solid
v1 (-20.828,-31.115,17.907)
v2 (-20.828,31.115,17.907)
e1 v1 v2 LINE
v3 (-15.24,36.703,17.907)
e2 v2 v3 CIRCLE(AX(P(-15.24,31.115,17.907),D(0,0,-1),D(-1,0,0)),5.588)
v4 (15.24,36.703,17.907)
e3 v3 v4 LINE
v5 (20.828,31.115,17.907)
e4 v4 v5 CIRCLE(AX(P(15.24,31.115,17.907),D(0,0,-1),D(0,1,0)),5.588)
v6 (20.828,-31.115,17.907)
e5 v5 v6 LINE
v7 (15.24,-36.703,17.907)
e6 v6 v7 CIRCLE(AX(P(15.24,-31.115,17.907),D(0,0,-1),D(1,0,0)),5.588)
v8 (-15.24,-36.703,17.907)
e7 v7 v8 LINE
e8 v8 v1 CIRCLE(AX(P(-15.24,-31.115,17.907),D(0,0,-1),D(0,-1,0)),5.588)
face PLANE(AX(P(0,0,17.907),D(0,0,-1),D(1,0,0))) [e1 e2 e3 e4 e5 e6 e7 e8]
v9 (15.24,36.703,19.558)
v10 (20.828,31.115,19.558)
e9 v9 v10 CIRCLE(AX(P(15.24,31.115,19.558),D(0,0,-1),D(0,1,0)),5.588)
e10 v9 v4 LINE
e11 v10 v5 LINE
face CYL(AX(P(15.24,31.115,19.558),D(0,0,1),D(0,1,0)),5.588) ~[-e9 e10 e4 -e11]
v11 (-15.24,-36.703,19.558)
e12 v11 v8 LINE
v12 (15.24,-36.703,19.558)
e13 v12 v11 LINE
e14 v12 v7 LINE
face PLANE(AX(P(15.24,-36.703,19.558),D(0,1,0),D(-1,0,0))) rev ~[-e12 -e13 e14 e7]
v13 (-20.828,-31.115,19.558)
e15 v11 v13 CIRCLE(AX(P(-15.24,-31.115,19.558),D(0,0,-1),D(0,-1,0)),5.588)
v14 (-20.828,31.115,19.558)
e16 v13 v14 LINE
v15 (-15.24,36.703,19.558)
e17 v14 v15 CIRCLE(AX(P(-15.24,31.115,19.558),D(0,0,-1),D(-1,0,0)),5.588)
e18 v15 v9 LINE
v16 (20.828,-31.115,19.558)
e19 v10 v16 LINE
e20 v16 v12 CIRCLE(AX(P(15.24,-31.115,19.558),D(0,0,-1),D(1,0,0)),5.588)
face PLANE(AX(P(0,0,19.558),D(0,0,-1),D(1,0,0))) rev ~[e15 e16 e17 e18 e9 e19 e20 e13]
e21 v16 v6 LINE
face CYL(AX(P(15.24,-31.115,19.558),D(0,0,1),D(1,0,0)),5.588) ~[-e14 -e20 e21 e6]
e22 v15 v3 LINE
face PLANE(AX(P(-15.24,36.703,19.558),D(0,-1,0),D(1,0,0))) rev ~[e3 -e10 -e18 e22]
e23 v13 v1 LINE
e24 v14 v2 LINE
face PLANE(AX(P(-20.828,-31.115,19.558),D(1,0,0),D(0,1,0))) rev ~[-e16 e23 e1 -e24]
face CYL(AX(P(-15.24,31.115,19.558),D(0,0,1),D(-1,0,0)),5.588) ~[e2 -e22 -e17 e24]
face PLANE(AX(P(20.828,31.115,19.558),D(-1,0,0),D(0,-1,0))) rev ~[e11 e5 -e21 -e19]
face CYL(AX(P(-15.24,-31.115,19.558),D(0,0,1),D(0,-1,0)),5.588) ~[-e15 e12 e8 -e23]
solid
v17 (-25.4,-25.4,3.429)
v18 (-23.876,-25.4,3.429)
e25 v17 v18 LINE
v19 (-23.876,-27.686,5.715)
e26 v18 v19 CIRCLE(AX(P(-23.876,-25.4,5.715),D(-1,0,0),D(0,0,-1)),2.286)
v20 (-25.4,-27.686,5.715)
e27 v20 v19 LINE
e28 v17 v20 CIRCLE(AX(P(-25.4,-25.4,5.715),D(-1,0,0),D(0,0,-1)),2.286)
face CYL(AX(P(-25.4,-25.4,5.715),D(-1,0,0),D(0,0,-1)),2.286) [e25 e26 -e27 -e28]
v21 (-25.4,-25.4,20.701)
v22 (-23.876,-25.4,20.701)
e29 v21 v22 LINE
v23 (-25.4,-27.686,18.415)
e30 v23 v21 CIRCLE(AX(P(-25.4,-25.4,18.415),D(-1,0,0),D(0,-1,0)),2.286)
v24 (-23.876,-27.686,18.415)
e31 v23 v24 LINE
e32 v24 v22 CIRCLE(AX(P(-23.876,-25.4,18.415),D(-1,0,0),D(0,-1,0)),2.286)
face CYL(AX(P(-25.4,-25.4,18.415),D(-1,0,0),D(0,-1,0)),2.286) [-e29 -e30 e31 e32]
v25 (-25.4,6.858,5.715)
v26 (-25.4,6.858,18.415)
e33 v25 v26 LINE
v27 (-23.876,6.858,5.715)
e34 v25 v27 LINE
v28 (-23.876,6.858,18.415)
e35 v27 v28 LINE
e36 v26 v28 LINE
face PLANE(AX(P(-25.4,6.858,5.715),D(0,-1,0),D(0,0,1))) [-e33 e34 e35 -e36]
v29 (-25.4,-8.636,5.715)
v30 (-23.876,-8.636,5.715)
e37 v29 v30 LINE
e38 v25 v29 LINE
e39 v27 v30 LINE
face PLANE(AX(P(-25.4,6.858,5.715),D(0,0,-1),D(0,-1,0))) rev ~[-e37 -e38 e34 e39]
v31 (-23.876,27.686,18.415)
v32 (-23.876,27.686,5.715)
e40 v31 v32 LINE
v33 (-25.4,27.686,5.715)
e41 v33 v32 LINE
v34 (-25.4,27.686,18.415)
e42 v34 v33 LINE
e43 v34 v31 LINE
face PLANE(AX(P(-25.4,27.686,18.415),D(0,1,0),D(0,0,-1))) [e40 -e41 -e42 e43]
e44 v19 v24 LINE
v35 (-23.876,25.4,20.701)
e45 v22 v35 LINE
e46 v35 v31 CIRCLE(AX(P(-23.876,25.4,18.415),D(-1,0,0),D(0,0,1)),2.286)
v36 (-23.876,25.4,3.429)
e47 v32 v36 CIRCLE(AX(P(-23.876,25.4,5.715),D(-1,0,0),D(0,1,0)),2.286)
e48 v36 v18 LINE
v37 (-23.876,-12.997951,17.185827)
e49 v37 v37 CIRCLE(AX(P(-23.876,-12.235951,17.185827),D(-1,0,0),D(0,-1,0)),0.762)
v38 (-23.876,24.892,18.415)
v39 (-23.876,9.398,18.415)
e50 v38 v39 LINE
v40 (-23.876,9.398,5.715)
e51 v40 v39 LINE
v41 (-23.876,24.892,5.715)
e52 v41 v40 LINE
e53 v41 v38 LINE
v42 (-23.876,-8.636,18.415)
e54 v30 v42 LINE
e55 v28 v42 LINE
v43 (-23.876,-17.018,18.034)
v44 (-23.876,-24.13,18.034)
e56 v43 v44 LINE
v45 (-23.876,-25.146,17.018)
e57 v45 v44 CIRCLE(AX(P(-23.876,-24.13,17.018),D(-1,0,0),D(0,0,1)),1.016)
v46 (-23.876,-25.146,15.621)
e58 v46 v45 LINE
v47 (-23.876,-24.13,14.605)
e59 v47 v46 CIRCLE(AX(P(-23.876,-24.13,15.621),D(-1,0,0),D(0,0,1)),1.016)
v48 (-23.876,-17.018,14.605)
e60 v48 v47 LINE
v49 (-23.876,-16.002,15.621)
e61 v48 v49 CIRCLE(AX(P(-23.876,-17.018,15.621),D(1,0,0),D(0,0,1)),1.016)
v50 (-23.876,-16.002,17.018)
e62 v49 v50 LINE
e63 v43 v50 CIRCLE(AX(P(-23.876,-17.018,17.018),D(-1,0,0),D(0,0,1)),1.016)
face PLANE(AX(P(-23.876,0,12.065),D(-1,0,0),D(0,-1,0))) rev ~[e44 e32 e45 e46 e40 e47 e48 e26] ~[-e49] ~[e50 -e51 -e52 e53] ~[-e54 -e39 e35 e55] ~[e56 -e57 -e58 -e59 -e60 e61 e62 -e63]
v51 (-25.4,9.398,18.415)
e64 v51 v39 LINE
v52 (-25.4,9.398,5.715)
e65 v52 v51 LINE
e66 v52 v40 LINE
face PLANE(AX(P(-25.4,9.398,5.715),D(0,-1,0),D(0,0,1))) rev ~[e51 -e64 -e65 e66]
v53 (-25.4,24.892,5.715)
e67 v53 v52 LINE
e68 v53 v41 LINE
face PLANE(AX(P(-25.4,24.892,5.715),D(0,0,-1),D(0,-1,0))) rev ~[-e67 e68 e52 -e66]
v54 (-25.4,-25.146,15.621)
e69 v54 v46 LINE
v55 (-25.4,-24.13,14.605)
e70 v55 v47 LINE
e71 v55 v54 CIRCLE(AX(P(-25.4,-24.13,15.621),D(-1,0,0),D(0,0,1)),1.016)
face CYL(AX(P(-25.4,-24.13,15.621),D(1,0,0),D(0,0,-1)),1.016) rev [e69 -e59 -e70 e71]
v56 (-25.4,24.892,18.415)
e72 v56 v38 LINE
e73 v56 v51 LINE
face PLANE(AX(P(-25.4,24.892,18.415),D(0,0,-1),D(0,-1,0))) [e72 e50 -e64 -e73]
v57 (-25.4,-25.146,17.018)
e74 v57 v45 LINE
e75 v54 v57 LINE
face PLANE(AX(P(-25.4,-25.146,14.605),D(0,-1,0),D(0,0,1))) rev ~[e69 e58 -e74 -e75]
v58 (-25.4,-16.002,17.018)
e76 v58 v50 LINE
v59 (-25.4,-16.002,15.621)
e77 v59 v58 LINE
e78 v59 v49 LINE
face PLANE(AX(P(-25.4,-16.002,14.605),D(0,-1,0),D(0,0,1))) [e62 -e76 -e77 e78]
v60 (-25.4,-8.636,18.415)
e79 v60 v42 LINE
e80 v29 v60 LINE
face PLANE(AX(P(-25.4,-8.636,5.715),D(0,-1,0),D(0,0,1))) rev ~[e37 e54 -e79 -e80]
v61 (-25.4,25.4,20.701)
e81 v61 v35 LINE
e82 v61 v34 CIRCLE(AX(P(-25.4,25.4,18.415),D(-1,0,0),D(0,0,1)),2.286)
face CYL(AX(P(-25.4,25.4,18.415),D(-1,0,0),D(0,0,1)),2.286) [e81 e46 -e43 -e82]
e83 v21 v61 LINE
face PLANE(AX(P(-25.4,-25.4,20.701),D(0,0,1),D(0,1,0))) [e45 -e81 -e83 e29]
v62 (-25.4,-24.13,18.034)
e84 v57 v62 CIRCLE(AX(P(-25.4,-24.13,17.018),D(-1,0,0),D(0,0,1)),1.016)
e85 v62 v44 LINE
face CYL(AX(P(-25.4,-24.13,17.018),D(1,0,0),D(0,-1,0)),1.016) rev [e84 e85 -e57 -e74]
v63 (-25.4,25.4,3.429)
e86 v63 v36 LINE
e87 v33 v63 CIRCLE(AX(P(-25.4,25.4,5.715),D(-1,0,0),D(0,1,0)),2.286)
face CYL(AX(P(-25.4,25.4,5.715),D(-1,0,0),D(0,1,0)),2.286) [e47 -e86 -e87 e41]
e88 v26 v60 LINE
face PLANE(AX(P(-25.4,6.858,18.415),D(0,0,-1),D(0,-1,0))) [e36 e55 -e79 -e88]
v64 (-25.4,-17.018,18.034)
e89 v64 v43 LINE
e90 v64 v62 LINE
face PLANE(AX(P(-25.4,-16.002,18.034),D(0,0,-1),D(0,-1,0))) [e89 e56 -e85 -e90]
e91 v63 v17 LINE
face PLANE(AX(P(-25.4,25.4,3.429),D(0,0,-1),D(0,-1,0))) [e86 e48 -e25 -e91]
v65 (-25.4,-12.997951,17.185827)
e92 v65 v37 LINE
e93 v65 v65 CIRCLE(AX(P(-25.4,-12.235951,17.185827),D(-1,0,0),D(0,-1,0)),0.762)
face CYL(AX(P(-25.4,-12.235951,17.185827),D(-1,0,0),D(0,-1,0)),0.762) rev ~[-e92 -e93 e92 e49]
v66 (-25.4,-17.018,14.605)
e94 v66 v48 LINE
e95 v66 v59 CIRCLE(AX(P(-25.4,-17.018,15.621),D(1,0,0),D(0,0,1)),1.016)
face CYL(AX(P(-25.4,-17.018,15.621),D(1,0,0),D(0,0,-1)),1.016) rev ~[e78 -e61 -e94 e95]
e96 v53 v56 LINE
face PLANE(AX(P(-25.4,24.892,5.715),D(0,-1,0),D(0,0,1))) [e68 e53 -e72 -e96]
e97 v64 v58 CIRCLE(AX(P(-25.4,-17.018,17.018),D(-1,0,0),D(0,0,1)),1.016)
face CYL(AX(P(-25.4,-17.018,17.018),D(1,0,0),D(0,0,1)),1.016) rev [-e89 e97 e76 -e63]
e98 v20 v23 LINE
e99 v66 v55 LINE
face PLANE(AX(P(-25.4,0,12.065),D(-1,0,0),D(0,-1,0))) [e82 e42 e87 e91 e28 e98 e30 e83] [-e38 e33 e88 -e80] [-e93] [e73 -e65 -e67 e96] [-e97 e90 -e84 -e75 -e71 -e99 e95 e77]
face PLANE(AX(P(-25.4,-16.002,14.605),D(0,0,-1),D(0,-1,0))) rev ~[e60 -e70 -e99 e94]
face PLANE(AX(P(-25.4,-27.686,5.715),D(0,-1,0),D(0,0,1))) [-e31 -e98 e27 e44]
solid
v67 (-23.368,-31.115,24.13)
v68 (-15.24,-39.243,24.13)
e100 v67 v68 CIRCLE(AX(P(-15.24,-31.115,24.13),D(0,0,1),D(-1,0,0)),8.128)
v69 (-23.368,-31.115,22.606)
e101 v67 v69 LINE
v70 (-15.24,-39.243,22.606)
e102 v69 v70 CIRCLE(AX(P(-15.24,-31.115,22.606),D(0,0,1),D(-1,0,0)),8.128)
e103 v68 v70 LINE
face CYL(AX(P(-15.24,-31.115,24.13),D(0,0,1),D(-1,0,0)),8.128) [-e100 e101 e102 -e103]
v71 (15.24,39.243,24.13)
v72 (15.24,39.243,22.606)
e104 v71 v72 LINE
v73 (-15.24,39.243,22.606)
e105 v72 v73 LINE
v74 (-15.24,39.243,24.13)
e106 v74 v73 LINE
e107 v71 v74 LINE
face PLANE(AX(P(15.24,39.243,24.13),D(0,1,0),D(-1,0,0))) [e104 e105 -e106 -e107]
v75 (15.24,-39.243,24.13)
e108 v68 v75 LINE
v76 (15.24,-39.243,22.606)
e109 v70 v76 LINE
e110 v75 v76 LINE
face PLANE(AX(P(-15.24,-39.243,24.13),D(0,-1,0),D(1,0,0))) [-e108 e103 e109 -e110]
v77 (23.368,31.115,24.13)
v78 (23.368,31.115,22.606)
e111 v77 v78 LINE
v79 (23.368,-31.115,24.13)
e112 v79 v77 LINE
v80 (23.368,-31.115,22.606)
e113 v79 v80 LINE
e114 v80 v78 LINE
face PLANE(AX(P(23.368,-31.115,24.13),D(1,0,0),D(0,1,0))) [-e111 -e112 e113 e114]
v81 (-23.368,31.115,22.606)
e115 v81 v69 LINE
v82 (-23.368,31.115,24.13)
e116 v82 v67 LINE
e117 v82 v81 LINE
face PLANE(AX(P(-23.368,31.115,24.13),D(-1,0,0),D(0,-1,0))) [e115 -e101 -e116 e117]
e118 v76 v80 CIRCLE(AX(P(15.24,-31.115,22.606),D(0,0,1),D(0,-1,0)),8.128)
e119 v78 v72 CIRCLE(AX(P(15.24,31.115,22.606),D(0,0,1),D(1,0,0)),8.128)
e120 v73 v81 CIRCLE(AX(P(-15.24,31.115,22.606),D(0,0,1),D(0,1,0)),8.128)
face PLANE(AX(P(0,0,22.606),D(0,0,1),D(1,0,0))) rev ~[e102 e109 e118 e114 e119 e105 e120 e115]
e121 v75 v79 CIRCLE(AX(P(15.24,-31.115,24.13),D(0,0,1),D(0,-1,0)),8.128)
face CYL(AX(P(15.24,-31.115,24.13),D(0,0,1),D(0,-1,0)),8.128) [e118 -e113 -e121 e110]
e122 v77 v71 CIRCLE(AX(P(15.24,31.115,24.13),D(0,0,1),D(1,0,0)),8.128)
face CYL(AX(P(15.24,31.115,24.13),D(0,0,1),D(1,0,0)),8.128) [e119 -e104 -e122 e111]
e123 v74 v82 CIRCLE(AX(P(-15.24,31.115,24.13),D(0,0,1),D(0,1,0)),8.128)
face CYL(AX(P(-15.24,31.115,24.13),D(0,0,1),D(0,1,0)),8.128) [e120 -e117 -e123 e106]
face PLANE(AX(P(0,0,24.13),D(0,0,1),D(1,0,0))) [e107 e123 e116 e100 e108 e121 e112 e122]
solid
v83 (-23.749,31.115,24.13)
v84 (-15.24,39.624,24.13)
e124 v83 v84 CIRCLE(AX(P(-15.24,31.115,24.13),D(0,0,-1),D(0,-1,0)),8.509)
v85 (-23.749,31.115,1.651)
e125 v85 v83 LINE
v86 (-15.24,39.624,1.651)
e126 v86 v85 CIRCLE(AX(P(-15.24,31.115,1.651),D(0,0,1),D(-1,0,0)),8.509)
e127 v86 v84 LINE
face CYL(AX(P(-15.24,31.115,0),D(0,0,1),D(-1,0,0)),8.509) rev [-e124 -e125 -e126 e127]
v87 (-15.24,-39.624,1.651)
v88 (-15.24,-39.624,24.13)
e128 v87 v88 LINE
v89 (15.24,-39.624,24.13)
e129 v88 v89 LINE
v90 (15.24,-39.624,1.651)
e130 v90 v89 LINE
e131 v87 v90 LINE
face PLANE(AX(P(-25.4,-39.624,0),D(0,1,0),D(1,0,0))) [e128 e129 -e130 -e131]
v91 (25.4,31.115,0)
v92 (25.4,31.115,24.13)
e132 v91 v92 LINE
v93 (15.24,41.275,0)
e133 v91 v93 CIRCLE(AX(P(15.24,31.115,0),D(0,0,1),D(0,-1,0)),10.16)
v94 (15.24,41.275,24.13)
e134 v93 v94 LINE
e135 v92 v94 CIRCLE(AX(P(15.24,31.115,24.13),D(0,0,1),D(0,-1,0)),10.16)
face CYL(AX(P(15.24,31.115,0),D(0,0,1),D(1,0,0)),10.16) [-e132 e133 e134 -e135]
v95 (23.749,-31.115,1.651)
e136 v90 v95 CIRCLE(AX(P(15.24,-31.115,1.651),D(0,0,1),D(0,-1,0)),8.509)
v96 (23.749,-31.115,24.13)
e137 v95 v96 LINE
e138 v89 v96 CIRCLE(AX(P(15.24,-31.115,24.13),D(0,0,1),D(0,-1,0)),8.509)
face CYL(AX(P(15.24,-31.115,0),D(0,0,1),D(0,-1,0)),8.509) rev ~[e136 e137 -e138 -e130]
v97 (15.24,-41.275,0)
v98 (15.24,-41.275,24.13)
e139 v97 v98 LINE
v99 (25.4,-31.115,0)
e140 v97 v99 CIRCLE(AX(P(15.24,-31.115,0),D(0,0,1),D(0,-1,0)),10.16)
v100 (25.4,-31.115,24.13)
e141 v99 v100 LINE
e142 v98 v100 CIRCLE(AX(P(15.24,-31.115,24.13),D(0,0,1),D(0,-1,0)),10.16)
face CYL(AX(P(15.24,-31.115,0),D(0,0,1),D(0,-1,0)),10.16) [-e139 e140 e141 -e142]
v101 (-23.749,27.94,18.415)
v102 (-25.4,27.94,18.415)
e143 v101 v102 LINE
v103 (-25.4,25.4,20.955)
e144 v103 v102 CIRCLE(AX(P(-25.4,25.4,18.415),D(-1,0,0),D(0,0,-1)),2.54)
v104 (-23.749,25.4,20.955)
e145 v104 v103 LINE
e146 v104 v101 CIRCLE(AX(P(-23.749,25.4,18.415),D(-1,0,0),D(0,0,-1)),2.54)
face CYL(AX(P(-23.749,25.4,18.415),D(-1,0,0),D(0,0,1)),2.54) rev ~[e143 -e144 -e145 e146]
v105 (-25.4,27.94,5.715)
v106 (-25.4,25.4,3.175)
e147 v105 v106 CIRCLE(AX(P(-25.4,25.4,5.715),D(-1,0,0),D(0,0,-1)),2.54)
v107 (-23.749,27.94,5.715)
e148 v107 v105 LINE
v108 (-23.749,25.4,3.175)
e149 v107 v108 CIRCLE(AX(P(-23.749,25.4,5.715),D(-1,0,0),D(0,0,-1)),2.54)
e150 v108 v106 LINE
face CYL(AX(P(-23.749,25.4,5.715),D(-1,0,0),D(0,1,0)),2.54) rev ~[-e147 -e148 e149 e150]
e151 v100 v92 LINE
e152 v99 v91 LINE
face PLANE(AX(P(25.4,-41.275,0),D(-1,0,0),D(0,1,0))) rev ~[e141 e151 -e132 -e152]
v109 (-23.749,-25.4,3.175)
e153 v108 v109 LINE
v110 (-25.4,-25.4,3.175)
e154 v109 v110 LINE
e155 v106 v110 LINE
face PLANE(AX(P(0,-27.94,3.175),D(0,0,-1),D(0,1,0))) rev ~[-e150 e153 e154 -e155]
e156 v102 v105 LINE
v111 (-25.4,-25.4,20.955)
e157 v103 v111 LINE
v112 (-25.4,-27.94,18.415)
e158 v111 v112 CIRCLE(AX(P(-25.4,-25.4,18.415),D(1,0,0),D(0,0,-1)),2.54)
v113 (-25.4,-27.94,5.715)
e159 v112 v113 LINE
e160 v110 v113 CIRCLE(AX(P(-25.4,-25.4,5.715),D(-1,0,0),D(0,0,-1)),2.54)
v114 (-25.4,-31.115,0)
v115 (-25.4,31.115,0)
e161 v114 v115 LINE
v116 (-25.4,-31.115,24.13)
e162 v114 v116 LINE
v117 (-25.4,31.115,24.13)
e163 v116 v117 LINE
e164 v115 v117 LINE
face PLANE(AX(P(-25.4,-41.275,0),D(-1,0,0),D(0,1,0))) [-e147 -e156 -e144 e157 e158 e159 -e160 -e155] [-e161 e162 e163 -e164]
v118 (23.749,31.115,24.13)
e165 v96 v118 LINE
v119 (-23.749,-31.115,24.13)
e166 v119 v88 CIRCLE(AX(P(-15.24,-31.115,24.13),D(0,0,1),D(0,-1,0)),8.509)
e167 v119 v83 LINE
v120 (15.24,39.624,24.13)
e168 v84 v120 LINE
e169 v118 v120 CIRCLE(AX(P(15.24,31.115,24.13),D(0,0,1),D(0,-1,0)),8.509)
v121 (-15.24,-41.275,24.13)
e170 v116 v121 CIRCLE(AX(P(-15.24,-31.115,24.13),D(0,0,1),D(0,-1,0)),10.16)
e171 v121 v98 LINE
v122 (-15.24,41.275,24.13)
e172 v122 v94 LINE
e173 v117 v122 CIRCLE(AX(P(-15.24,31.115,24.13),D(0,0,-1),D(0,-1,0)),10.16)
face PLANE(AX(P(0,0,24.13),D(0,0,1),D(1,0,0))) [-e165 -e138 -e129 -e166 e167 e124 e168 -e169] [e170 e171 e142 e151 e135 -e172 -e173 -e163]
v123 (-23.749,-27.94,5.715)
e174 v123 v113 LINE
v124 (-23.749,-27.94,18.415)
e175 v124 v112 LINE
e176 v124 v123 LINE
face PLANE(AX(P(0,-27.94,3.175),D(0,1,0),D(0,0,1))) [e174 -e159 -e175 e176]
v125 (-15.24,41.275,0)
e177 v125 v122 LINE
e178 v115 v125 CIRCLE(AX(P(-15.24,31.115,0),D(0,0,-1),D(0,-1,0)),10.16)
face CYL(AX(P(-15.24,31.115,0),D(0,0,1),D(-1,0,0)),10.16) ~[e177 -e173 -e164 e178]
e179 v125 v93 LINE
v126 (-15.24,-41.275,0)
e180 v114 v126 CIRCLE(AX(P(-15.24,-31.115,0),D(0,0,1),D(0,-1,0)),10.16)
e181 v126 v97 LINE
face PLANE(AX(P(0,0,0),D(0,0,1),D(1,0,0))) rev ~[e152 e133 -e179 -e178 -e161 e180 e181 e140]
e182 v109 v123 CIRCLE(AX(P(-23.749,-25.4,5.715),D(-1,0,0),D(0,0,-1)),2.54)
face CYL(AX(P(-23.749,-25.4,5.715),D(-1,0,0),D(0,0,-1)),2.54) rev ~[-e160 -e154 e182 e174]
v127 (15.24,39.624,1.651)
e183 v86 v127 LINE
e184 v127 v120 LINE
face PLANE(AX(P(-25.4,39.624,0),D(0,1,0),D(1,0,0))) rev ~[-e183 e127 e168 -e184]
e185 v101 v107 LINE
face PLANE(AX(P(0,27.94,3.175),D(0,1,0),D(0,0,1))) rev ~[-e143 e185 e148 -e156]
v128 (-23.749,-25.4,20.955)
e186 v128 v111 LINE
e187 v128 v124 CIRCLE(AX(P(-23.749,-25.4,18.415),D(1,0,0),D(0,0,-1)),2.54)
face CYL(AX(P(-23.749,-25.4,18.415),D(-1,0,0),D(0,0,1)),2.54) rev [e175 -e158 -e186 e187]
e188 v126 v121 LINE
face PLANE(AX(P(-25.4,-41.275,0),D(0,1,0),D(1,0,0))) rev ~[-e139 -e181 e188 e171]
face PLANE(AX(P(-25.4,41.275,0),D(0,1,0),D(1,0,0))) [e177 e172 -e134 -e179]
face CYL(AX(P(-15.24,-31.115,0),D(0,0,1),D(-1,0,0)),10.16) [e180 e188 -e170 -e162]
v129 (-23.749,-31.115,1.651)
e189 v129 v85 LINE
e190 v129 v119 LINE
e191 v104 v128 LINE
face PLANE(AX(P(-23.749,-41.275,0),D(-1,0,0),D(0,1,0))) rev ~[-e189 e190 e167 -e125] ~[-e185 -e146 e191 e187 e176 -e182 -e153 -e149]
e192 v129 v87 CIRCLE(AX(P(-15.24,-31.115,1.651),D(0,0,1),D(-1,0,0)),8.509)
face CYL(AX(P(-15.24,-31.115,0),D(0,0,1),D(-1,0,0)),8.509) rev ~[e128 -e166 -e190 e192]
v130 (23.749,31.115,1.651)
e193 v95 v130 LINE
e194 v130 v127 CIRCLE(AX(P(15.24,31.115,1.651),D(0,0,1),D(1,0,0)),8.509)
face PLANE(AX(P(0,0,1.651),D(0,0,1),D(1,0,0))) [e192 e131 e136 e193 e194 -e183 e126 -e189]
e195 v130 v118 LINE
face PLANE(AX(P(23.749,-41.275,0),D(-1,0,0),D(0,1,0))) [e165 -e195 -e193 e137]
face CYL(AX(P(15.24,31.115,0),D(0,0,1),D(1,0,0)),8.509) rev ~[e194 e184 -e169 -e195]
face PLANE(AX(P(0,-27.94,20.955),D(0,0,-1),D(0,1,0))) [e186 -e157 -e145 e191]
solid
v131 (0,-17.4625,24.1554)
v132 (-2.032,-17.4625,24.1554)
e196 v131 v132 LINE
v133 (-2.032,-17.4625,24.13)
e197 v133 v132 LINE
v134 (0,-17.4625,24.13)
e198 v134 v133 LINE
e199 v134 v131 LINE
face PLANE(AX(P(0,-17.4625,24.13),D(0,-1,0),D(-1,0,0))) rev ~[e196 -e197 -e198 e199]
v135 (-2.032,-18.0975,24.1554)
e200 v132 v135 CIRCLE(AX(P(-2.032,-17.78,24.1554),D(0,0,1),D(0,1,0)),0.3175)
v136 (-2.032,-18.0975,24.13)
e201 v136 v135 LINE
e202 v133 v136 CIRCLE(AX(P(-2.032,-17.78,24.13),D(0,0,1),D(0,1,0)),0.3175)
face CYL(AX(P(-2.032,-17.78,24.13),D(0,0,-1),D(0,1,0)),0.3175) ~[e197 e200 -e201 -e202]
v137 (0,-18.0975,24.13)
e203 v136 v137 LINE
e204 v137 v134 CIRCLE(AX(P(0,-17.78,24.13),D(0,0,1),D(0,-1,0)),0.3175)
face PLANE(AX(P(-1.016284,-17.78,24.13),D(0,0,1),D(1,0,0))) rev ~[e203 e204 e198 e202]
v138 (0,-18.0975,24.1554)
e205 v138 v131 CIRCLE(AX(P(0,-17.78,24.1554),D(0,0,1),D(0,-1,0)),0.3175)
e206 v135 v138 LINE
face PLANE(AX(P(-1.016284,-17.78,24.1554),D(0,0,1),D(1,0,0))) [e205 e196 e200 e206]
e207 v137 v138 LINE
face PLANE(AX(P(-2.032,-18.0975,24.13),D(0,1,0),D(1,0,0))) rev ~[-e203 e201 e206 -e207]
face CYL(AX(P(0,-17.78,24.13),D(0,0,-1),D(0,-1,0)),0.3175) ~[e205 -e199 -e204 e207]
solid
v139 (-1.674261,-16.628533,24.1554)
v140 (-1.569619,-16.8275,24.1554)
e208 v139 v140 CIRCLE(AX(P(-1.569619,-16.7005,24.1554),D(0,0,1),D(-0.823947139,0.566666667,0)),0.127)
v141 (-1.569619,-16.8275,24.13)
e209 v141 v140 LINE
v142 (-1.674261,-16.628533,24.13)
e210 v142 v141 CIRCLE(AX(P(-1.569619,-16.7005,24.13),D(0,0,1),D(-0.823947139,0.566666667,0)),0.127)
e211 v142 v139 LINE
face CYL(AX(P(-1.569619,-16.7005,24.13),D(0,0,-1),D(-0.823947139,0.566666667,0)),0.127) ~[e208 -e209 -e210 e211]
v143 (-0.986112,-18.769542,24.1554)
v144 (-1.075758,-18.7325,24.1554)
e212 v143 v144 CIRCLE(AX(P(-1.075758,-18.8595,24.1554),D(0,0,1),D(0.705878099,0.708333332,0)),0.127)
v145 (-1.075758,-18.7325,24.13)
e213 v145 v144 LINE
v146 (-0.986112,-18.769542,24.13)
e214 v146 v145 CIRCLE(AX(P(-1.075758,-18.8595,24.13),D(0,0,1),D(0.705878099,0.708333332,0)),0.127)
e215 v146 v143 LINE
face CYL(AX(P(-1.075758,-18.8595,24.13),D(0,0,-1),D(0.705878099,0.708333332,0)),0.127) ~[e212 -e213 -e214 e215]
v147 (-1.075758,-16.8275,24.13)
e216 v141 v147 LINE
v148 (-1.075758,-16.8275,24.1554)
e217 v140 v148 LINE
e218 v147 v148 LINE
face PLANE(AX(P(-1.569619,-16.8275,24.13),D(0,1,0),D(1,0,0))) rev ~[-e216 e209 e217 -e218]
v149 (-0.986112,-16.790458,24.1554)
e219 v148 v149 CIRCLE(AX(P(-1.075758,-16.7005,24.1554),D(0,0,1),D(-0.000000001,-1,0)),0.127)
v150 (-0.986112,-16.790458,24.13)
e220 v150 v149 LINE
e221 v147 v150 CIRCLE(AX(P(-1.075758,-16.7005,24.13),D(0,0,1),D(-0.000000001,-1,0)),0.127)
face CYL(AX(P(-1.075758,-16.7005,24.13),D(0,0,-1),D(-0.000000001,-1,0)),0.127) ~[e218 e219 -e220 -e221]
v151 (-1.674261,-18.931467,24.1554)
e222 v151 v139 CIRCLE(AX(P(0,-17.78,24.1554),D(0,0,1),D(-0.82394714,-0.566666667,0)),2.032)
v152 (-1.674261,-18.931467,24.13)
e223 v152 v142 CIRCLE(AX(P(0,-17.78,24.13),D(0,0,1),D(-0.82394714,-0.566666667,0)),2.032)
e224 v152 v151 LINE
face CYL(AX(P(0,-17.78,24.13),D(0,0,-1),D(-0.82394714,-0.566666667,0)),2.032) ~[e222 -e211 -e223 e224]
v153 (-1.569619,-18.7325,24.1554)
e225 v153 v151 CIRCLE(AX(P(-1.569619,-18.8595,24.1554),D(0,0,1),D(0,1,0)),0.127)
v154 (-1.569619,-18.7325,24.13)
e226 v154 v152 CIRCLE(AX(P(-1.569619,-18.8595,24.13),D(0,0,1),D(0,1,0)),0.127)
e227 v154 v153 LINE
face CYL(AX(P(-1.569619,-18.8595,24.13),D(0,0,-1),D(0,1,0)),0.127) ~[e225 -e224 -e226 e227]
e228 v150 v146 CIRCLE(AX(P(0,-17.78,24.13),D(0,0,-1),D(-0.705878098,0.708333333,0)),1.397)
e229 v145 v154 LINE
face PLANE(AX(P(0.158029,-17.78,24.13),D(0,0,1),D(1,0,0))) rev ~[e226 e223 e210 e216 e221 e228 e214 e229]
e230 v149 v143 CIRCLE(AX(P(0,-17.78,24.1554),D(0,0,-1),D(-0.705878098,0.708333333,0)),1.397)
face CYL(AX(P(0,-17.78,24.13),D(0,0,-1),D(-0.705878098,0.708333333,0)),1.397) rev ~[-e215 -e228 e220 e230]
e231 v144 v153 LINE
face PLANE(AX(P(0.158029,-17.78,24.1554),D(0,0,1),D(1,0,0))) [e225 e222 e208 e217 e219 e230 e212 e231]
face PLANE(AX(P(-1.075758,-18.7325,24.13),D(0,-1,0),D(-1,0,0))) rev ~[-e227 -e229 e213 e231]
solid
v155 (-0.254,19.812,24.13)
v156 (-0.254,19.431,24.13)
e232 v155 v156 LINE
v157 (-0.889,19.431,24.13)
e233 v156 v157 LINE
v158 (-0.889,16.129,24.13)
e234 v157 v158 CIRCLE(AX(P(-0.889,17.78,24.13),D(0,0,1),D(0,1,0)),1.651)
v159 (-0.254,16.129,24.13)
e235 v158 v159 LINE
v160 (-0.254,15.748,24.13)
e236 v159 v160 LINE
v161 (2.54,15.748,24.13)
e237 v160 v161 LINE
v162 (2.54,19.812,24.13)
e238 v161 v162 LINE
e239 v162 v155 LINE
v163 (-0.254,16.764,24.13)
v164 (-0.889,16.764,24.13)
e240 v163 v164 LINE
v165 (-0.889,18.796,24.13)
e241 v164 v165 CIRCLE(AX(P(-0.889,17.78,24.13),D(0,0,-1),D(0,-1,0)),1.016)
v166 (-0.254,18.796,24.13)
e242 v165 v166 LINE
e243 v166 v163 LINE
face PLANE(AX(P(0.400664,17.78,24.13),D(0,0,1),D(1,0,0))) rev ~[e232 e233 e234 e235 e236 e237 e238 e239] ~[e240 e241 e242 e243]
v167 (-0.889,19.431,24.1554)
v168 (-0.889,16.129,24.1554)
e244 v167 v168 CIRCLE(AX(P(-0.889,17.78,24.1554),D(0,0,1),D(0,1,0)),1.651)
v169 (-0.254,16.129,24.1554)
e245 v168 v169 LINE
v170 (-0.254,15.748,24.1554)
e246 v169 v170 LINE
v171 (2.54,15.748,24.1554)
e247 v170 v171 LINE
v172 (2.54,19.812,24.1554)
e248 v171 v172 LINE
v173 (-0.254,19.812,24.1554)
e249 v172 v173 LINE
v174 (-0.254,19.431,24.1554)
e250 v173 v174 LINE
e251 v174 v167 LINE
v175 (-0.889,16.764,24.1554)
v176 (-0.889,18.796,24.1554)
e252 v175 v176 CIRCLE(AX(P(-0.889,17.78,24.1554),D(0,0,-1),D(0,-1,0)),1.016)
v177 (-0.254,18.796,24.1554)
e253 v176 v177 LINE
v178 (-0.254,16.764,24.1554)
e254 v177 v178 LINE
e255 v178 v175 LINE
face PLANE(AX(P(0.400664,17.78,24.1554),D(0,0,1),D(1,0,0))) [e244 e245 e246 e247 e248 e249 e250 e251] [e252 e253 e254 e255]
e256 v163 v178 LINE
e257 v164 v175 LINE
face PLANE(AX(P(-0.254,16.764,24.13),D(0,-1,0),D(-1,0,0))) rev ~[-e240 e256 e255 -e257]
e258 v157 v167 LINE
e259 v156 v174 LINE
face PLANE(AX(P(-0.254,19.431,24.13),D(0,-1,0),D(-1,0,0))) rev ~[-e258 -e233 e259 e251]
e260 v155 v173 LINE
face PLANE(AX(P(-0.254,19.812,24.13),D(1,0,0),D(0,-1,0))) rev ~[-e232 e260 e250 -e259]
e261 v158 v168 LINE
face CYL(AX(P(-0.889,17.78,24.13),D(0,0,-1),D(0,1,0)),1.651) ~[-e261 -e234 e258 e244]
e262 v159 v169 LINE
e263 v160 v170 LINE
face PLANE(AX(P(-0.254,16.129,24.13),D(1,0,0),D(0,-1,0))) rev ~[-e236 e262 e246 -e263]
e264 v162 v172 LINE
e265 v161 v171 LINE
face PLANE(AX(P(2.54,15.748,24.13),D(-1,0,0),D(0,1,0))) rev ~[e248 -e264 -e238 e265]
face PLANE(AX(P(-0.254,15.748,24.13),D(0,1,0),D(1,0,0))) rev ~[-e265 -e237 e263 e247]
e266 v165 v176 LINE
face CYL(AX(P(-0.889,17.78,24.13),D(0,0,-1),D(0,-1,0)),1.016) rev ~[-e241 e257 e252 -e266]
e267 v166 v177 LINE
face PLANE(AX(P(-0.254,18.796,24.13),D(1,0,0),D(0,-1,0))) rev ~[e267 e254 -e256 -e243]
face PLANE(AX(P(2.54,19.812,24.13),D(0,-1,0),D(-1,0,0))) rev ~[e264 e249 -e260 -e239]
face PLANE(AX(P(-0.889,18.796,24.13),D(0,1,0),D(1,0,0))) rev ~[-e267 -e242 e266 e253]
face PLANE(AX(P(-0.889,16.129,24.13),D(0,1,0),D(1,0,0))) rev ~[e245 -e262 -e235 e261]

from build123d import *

# Parameters (mm, degrees)
F0_W      = 50.8
F0_H      = 82.55
F1_DEPTH  = 24.13
F2_R      = 10.16
F3_T      = -1.651
F5_DEPTH  = 6.35
F8_T      = -1.524
F14_DEPTH = 1.651
F16_DEPTH = 0.0254
F18_DEPTH = 0.0254
F19_W     = 55.88
F19_H     = 17.78
F20_DEPTH = 25.401
F21_R     = 2.54
F23_DEPTH = 1.524
F24_W     = 15.494
F24_H     = 12.7
F24_W_2   = 9.144
F24_H_2   = 3.429
F24_R     = 0.762
F25_DEPTH = 50.801
F26_R     = 1.016


with BuildPart() as f1:
    # F0 (on Top) → F1 (new body)
    with BuildSketch(Plane.XY):
        Rectangle(F0_W, F0_H)
    extrude(amount=F1_DEPTH)

    # F2
    f2_edges = [f1.edges().sort_by_distance(p)[0] for p in [
        (25.4, -41.275, 12.065),
        (-25.4, -41.275, 12.065),
        (25.4, 41.275, 12.065),
        (-25.4, 41.275, 12.065),
    ]]
    fillet(f2_edges, radius=F2_R)

    # F3
    f3_openings = [f1.faces().sort_by_distance(p)[0] for p in [
        (0, 0, 24.13),
    ]]
    offset(amount=F3_T, openings=f3_openings)

    # F19 (on Right) → F20 (cut, through all)
    with BuildSketch(Plane.YZ):
        with Locations((0, 12.065)):
            Rectangle(F19_W, F19_H)
    extrude(amount=-F20_DEPTH, mode=Mode.SUBTRACT)

    # F21
    f21_edges = [f1.edges().sort_by_distance(p)[0] for p in [
        (-24.5745, 27.94, 20.955),
        (-24.5745, -27.94, 20.955),
        (-24.5745, -27.94, 3.175),
        (-24.5745, 27.94, 3.175),
    ]]
    fillet(f21_edges, radius=F21_R)


with BuildPart() as f5:
    # F4 (on face) → F5 (new body)
    with BuildSketch(Plane.XY.offset(24.13)):
        with BuildLine():
            Line((15.24, 39.243), (-15.24, 39.243))
            ThreePointArc((-15.24, 39.243), (-20.9873639175, 36.8623639175), (-23.368, 31.115))
            Line((-23.368, 31.115), (-23.368, -31.115))
            ThreePointArc((-23.368, -31.115), (-20.9873639175, -36.8623639175), (-15.24, -39.243))
            Line((-15.24, -39.243), (15.24, -39.243))
            ThreePointArc((15.24, -39.243), (20.9873639175, -36.8623639175), (23.368, -31.115))
            Line((23.368, -31.115), (23.368, 31.115))
            ThreePointArc((23.368, 31.115), (20.9873639175, 36.8623639175), (15.24, 39.243))
        make_face()
    extrude(amount=-F5_DEPTH)

    # F8
    f8_openings = [f5.faces().sort_by_distance(p)[0] for p in [
        (0, 0, 17.78),
        (0, -39.243, 20.955),
        (20.987364, -36.862364, 20.955),
        (-20.987364, -36.862364, 20.955),
        (23.368, 0, 20.955),
        (20.987364, 36.862364, 20.955),
        (0, 39.243, 20.955),
        (-20.987364, 36.862364, 20.955),
        (-23.368, 0, 20.955),
    ]]
    offset(amount=F8_T, openings=f8_openings)


with BuildPart() as f14:
    # F13 (on offset) → F14 (new body)
    with BuildSketch(Plane(origin=(0, 0, 19.558), x_dir=(1, 0, 0), z_dir=(0, 0, -1))):
        with BuildLine():
            Line((-20.828, 31.115), (-20.828, -31.115))
            ThreePointArc((-20.828, -31.115), (-19.1913126933, -35.0663126933), (-15.24, -36.703))
            Line((-15.24, -36.703), (15.24, -36.703))
            ThreePointArc((15.24, -36.703), (19.1913126933, -35.0663126933), (20.828, -31.115))
            Line((20.828, -31.115), (20.828, 31.115))
            ThreePointArc((20.828, 31.115), (19.1913126933, 35.0663126933), (15.24, 36.703))
            Line((15.24, 36.703), (-15.24, 36.703))
            ThreePointArc((-15.24, 36.703), (-19.1913126933, 35.0663126933), (-20.828, 31.115))
        make_face()
    extrude(amount=F14_DEPTH)


with BuildPart() as f16:
    # F15 (on face) → F16 (new body)
    with BuildSketch(Plane.XY.offset(24.13)):
        with BuildLine():
            ThreePointArc((-2.032, -18.0975), (-2.0195881687, -18.0972573032), (-2.0071953125, -18.0965295839))
            ThreePointArc((-2.0071953125, -18.0965295839), (-2.0071187349, -18.0970148012), (-2.0070420399, -18.0975))
            Line((-2.0070420399, -18.0975), (0, -18.0975))
            ThreePointArc((0, -18.0975), (0.3175, -17.78), (0, -17.4625))
            Line((0, -17.4625), (-2.0070420399, -17.4625))
            ThreePointArc((-2.0070420399, -17.4625), (-2.0071187349, -17.4629851988), (-2.0071953125, -17.4634704161))
            ThreePointArc((-2.0071953125, -17.4634704161), (-2.0195881687, -17.4627426968), (-2.032, -17.4625))
            ThreePointArc((-2.032, -17.4625), (-2.3495, -17.78), (-2.032, -18.0975))
        make_face()
        with BuildLine():
            ThreePointArc((-2.0070420399, -18.0975), (-2.0071187349, -18.0970148012), (-2.0071953125, -18.0965295839))
            ThreePointArc((-2.0071953125, -18.0965295839), (-2.0195881687, -18.0972573032), (-2.032, -18.0975))
            Line((-2.032, -18.0975), (-2.0070420399, -18.0975))
        make_face()
        with BuildLine():
            Line((-2.0070420399, -17.4625), (-2.032, -17.4625))
            ThreePointArc((-2.032, -17.4625), (-2.0195881687, -17.4627426968), (-2.0071953125, -17.4634704161))
            ThreePointArc((-2.0071953125, -17.4634704161), (-2.0071187349, -17.4629851988), (-2.0070420399, -17.4625))
        make_face()
    extrude(amount=F16_DEPTH)


with BuildPart() as f16b:
    # F15 (on face) → F16, piece 2 (new body)
    with BuildSketch(Plane.XY.offset(24.13)):
        with BuildLine():
            ThreePointArc((-0.9861117026, -16.7904583333), (1.397, -17.78), (-0.9861117026, -18.7695416667))
            ThreePointArc((-0.9861117026, -18.7695416667), (-1.0272592949, -18.7421251553), (-1.075758221, -18.7325))
            Line((-1.075758221, -18.7325), (-1.569619301, -18.7325))
            ThreePointArc((-1.569619301, -18.7325), (-1.6820220738, -18.8003847171), (-1.6742605877, -18.9314666667))
            ThreePointArc((-1.6742605877, -18.9314666667), (2.032, -17.78), (-1.6742605877, -16.6285333333))
            ThreePointArc((-1.6742605877, -16.6285333333), (-1.6820220738, -16.7596152829), (-1.569619301, -16.8275))
            Line((-1.569619301, -16.8275), (-1.075758221, -16.8275))
            ThreePointArc((-1.075758221, -16.8275), (-1.0272592949, -16.8178748447), (-0.9861117026, -16.7904583333))
        make_face()
    extrude(amount=F16_DEPTH)


with BuildPart() as f18:
    # F17 (on face) → F18 (new body)
    with BuildSketch(Plane.XY.offset(24.13)):
        with BuildLine():
            Line((2.54, 15.748), (2.54, 19.812))
            Line((2.54, 19.812), (-0.254, 19.812))
            Line((-0.254, 19.812), (-0.254, 19.431))
            Line((-0.254, 19.431), (-0.889, 19.431))
            ThreePointArc((-0.889, 19.431), (-2.54, 17.78), (-0.889, 16.129))
            Line((-0.889, 16.129), (-0.254, 16.129))
            Line((-0.254, 16.129), (-0.254, 15.748))
            Line((-0.254, 15.748), (2.54, 15.748))
        make_face()
        with BuildLine():
            ThreePointArc((-0.889, 16.764), (-1.905, 17.78), (-0.889, 18.796))
            Line((-0.889, 18.796), (-0.254, 18.796))
            Line((-0.254, 18.796), (-0.254, 16.764))
            Line((-0.254, 16.764), (-0.889, 16.764))
        make_face(mode=Mode.SUBTRACT)
    extrude(amount=F18_DEPTH)


with BuildPart() as f23:
    # F22 (on face) → F23 (new body)
    with BuildSketch(Plane(origin=(-25.4, 0, 0), x_dir=(0, -1, 0), z_dir=(-1, 0, 0))):
        with BuildLine():
            ThreePointArc((25.4, 3.429), (27.0164461018, 4.0985538982), (27.686, 5.715))
            Line((27.686, 5.715), (27.686, 18.415))
            ThreePointArc((27.686, 18.415), (27.0164461018, 20.0314461018), (25.4, 20.701))
            Line((25.4, 20.701), (-25.4, 20.701))
            ThreePointArc((-25.4, 20.701), (-27.0164461018, 20.0314461018), (-27.686, 18.415))
            Line((-27.686, 18.415), (-27.686, 5.715))
            ThreePointArc((-27.686, 5.715), (-27.0164461018, 4.0985538982), (-25.4, 3.429))
            Line((-25.4, 3.429), (25.4, 3.429))
        make_face()
    extrude(amount=-F23_DEPTH)

    # F24 (on face) → F25 (cut, through all)
    with BuildSketch(Plane(origin=(-25.4, 0, 0), x_dir=(0, -1, 0), z_dir=(-1, 0, 0))):
        with Locations((-17.145, 12.065)):
            Rectangle(F24_W, F24_H)
        with Locations((0.889, 12.065)):
            Rectangle(F24_W, F24_H)
        with Locations((20.574, 16.3195)):
            Rectangle(F24_W_2, F24_H_2)
        with Locations((12.235950573, 17.1858270001)):
            Circle(F24_R)
    extrude(amount=-F25_DEPTH, mode=Mode.SUBTRACT)

    # F26
    f26_edges = [f23.edges().sort_by_distance(p)[0] for p in [
        (-24.638, -16.002, 18.034),
        (-24.638, -25.146, 18.034),
        (-24.638, -16.002, 14.605),
        (-24.638, -25.146, 14.605),
    ]]
    fillet(f26_edges, radius=F26_R)


solid = Compound([f1.part, f5.part, f14.part, f16.part, f16b.part, f18.part, f23.part])
